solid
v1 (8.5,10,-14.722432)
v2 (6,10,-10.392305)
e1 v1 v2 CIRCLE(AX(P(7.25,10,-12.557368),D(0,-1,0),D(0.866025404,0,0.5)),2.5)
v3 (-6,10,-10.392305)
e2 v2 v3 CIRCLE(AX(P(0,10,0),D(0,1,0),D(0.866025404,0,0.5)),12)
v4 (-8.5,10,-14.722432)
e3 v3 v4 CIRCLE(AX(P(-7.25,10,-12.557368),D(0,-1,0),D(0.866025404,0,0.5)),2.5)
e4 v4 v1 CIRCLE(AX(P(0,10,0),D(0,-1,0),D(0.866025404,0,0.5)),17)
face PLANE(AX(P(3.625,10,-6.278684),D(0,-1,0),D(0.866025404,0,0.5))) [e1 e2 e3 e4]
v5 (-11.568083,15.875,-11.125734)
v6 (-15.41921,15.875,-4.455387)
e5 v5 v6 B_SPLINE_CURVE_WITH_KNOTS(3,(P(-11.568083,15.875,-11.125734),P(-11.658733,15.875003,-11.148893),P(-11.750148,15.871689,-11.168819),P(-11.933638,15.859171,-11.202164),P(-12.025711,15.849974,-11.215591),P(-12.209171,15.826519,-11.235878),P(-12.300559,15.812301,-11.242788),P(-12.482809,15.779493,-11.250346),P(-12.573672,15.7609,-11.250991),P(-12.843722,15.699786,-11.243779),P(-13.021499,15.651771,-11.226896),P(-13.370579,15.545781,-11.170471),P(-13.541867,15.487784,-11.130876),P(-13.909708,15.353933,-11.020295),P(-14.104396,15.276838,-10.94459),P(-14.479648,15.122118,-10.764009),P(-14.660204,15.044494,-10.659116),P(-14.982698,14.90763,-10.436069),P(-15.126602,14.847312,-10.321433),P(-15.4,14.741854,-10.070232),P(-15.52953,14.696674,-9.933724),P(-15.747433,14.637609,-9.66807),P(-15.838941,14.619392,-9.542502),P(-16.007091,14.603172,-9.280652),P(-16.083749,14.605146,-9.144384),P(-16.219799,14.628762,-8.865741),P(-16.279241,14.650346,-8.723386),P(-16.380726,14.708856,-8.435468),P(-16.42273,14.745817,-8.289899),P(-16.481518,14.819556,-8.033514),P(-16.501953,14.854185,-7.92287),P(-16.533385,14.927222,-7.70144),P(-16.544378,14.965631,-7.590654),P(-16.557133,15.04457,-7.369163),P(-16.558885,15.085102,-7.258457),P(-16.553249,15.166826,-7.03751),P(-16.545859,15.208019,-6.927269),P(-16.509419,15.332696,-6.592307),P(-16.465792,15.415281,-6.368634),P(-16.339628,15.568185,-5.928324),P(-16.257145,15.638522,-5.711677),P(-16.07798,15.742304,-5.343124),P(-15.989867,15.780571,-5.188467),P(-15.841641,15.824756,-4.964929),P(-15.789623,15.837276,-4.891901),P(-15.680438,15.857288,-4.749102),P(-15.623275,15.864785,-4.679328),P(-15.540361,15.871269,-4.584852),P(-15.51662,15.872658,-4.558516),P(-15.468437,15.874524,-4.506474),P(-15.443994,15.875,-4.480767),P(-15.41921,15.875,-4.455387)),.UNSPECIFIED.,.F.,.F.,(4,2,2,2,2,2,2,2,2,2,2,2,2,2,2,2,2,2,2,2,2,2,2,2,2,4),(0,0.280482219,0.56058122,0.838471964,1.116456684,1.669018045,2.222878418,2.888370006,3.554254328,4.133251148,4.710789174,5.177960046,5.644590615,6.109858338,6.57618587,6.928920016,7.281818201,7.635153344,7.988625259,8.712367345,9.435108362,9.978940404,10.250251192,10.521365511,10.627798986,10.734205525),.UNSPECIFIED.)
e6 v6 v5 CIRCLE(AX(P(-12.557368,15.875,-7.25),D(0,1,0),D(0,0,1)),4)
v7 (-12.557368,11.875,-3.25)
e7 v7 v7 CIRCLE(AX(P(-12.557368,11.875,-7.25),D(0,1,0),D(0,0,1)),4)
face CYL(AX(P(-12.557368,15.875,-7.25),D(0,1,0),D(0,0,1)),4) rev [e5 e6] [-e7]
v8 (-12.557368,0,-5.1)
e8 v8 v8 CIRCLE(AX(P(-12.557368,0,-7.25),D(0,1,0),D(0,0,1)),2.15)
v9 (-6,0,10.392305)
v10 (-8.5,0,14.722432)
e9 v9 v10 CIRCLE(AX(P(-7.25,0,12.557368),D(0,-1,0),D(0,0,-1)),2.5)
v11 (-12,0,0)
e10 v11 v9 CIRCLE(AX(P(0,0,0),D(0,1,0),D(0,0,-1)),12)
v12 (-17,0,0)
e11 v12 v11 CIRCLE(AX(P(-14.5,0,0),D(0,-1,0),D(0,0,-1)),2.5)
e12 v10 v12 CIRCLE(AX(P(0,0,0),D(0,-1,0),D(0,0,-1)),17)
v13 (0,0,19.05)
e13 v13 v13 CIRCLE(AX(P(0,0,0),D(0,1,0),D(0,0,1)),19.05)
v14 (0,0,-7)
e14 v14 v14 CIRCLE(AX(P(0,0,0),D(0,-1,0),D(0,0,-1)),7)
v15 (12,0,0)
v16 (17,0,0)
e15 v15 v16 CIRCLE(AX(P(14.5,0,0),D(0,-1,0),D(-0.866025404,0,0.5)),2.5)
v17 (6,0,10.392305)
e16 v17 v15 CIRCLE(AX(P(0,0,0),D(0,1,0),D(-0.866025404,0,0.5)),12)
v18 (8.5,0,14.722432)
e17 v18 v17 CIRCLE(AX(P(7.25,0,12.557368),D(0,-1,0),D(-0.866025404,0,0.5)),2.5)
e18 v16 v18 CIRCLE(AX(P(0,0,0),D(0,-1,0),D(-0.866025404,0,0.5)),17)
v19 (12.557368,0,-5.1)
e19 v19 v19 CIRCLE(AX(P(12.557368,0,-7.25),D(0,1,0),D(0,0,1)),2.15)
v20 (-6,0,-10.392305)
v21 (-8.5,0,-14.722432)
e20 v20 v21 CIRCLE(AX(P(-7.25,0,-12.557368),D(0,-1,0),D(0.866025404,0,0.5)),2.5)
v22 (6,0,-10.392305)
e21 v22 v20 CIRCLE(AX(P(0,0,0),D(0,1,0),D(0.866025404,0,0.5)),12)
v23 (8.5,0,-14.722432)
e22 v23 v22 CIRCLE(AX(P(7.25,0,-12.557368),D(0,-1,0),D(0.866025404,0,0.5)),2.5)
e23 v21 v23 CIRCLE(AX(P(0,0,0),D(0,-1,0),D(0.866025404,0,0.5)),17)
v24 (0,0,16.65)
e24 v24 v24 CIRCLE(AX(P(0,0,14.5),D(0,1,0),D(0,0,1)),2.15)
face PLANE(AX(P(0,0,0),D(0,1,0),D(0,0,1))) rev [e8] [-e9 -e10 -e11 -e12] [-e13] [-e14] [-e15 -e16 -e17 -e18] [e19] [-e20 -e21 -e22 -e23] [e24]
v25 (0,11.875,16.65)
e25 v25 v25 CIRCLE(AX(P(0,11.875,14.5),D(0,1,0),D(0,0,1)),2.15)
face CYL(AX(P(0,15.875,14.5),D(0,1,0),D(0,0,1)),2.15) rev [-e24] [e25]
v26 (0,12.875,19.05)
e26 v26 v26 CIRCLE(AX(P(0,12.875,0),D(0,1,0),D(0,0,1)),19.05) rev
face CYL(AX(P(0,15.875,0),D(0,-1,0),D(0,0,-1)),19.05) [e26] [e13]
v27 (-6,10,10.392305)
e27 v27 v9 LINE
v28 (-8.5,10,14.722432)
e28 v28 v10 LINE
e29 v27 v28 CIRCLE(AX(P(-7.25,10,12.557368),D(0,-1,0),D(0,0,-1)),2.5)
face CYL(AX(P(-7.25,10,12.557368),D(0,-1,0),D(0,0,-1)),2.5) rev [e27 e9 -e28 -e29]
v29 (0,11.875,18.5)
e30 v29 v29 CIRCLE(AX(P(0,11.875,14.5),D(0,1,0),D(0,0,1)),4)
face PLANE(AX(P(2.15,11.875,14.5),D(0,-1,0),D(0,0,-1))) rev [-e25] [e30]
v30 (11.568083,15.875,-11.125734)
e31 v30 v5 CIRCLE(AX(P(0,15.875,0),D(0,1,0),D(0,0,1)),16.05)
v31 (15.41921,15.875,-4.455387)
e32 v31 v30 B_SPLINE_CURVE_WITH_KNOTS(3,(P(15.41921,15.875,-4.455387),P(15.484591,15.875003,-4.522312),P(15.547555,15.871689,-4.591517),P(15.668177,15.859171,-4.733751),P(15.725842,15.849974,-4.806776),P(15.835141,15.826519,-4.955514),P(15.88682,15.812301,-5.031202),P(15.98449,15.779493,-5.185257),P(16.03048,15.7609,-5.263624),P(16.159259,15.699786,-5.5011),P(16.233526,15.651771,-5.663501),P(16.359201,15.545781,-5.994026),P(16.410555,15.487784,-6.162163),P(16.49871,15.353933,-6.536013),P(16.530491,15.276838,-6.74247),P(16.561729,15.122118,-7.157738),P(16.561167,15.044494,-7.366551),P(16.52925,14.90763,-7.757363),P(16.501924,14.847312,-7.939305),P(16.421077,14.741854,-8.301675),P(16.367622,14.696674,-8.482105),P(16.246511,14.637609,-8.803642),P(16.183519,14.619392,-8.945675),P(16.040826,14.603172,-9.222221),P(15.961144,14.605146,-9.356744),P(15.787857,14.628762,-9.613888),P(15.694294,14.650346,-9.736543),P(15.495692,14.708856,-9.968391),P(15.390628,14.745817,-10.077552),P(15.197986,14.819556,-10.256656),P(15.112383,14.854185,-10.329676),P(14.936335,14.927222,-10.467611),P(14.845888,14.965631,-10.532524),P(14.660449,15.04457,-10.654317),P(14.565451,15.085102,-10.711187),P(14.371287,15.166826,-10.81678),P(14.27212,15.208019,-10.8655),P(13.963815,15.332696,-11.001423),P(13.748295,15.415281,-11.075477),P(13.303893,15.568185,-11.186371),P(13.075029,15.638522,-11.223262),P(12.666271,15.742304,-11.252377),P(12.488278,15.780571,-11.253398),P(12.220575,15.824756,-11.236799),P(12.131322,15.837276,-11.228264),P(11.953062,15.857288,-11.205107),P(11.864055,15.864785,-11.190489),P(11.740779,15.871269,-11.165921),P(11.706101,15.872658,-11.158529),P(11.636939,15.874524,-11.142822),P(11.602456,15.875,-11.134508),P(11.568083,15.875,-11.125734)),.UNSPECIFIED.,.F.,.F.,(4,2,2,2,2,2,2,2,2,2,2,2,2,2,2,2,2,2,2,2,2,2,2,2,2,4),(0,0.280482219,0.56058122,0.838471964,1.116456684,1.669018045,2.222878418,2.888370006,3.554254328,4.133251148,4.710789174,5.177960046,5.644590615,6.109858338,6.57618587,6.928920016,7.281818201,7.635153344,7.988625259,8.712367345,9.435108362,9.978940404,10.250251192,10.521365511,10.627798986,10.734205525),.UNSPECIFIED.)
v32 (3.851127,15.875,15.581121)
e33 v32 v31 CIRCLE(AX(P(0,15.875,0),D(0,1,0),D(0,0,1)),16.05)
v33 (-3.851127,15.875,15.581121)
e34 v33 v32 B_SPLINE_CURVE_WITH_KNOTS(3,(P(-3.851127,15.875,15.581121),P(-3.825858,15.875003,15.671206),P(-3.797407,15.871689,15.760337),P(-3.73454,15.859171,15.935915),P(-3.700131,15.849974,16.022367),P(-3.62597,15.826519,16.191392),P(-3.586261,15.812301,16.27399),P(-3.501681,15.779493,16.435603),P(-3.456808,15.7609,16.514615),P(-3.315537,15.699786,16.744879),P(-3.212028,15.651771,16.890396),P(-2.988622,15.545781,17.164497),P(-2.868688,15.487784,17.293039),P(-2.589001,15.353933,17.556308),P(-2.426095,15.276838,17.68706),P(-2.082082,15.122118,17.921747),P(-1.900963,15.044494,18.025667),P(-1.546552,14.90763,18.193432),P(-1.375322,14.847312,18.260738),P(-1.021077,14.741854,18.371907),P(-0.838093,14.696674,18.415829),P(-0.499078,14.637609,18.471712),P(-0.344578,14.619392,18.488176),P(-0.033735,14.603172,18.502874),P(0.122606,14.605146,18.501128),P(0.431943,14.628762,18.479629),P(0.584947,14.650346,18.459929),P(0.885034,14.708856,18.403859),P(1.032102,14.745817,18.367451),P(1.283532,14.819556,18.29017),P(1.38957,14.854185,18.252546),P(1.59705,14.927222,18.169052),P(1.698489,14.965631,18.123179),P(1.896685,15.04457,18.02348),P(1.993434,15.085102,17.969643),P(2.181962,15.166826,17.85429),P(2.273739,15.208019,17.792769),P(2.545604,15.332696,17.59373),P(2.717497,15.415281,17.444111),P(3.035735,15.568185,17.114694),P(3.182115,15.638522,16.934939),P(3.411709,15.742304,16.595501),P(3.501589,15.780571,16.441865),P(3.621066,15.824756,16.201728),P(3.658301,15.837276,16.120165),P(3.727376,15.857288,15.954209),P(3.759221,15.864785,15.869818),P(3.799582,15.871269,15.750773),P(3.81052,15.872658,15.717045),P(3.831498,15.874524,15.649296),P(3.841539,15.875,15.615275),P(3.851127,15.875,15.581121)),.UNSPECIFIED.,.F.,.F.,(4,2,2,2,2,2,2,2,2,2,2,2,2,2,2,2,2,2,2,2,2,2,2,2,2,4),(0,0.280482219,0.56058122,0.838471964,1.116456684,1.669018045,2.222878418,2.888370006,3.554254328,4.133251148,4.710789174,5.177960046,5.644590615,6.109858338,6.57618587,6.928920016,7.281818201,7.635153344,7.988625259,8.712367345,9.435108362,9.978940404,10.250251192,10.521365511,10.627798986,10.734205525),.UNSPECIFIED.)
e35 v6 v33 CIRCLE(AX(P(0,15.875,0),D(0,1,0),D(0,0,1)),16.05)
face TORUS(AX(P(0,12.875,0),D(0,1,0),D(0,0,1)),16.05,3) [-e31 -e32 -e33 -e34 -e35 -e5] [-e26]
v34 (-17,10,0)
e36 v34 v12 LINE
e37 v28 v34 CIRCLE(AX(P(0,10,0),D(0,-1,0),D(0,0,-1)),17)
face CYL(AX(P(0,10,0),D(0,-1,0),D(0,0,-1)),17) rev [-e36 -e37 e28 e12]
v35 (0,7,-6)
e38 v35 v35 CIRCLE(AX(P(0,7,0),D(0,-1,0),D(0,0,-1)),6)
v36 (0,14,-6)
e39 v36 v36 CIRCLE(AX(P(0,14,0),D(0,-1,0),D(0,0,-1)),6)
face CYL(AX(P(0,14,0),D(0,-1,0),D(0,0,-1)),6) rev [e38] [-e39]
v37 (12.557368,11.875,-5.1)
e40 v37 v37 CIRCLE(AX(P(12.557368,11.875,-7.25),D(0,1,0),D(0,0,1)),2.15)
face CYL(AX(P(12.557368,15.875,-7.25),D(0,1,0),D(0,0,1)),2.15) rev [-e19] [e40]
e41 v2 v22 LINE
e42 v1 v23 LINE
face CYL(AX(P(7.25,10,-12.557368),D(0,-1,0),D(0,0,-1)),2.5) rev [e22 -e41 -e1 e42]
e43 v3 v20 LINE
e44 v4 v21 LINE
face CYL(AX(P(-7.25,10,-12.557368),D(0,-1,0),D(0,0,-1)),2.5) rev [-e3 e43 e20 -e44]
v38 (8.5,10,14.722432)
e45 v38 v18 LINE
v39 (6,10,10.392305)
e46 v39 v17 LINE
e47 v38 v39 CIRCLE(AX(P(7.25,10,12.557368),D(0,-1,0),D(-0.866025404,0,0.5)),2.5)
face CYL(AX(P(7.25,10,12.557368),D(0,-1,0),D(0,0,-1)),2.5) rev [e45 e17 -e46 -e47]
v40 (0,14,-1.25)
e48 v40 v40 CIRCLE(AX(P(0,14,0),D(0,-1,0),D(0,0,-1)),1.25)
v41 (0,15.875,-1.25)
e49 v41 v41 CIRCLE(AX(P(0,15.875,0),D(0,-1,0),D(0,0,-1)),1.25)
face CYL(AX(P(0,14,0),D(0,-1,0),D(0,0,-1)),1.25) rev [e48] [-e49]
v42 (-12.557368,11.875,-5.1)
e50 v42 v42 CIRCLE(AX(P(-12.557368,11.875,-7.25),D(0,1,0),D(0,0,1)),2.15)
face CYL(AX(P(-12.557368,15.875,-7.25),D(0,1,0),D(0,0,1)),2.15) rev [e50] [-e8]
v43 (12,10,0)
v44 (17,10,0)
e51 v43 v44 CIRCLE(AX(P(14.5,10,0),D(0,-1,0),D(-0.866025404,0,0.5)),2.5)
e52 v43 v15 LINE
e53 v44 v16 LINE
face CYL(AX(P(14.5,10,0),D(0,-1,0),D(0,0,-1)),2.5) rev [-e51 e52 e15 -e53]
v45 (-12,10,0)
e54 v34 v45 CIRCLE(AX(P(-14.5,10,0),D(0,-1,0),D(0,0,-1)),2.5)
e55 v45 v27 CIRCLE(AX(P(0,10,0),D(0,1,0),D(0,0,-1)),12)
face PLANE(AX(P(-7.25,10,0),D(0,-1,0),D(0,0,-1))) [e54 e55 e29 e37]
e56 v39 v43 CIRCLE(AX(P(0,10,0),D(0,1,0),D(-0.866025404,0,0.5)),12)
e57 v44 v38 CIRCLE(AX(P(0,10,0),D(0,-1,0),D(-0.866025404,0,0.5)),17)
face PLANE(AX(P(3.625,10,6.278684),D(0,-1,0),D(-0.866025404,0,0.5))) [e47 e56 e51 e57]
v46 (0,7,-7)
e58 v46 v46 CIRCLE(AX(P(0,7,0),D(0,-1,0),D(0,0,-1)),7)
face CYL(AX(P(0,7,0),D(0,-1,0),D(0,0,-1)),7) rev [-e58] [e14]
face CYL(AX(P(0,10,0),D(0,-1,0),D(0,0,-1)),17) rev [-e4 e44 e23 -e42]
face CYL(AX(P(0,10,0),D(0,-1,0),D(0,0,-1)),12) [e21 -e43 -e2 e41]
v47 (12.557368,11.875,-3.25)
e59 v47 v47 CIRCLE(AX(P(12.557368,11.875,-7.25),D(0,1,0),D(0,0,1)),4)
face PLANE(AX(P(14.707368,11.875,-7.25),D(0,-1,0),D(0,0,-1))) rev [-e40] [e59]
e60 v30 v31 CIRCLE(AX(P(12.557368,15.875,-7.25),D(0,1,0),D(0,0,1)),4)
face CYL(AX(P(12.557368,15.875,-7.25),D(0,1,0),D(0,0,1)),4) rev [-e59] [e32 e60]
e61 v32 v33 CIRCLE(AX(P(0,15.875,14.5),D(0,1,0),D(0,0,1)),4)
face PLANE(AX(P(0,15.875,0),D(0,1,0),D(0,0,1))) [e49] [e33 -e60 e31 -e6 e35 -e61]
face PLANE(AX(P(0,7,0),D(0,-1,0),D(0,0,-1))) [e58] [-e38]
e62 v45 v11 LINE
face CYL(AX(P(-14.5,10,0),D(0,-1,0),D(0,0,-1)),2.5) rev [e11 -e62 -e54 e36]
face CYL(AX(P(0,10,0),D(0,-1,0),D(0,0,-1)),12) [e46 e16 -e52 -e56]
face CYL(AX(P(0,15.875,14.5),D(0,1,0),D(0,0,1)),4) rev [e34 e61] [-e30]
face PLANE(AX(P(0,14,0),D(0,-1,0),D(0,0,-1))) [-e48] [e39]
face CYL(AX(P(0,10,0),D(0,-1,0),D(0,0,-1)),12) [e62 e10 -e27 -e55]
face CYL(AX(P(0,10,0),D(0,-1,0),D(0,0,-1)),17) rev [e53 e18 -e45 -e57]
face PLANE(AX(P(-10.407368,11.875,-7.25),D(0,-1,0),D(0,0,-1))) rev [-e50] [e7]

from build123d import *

# Parameters (mm, degrees)
SKETCH1_R                      = 19.05
BOSS_EXTRUDE1_DEPTH            = 15.875
SKETCH2_R                      = 7
CUT_EXTRUDE1_DEPTH             = 7
SKETCH3_R                      = 6
CUT_EXTRUDE2_DEPTH             = 7
M3X0_5_TAPPED_HOLE1_D          = 2.5
CBORE_FOR_M4_SHCS1_D           = 4.3
CBORE_FOR_M4_SHCS1_CBORE_D     = 8
CBORE_FOR_M4_SHCS1_CBORE_DEPTH = 4
CIRPATTERN1_COUNT              = 3
FILLET1_R                      = 3
CUT_EXTRUDE3_DEPTH             = 10
CIRPATTERN2_COUNT              = 3


with BuildPart() as part:
    # Sketch1 → Boss-Extrude1 (new body)
    with BuildSketch(Plane(origin=(0, 0, 0), x_dir=(1, 0, 0), z_dir=(0, 1, 0))):
        with Locations(Location((0, 0, 0), (0, 0, 270))):
            Circle(SKETCH1_R)
    extrude(amount=BOSS_EXTRUDE1_DEPTH)

    # Sketch2 → Cut-Extrude1 (cut)
    with BuildSketch(Plane.XZ):
        with Locations(Location((0, 0, 0), (0, 0, 270))):
            Circle(SKETCH2_R)
    extrude(amount=-CUT_EXTRUDE1_DEPTH, mode=Mode.SUBTRACT)

    # Sketch3 → Cut-Extrude2 (cut)
    with BuildSketch(Plane.XZ.offset(-7)):
        with Locations(Location((0, 0, 0), (0, 0, 270))):
            Circle(SKETCH3_R)
    extrude(amount=-CUT_EXTRUDE2_DEPTH, mode=Mode.SUBTRACT)

    # M3x0.5 Tapped Hole1 (through all)
    with Locations(Plane.XZ.offset(-14)):
        with Locations((0, 0)):
            Hole(M3X0_5_TAPPED_HOLE1_D / 2)

    # CBORE for M4 SHCS1 (through all)
    with Locations(Plane(origin=(0, 15.875, 0), x_dir=(-1, 0, 0), z_dir=(0, 1, 0))):
        with Locations((0, 14.5)):
            cbore_for_m4_shcs1 = CounterBoreHole(CBORE_FOR_M4_SHCS1_D / 2, CBORE_FOR_M4_SHCS1_CBORE_D / 2, CBORE_FOR_M4_SHCS1_CBORE_DEPTH)

    # CirPattern1: CBORE for M4 SHCS1 ×3 about axis
    cirpattern1_axis = Axis((0, 0, 0), (0, 1, 0))
    for i in range(1, CIRPATTERN1_COUNT):
        add(cbore_for_m4_shcs1.rotate(cirpattern1_axis, i * 360 / CIRPATTERN1_COUNT), mode=Mode.SUBTRACT)

    # Fillet1
    # the kernel refuses this fillet: 3 mm, written as the material it takes off along each edge
    with BuildSketch(Plane(origin=(0, 15.875, 0), x_dir=(0, 0, 1), z_dir=(-1, 0, 0))) as fillet1_piece_1:
        with BuildLine():
            CenterArc((19.05 - FILLET1_R, -FILLET1_R), FILLET1_R, 0, 90)
            Line((19.05 - FILLET1_R, 0), (19.05, 0))
            Line((19.05, 0), (19.05, -FILLET1_R))
        make_face()
    revolve(axis=Axis((0, 15.875, 0), (0, 1, 0)), mode=Mode.SUBTRACT)

    # Sketch9 → Cut-Extrude3 (cut)
    with BuildSketch(Plane.XZ):
        with BuildLine():
            ThreePointArc((-6, 10.392304845), (-5.084936491, 13.807368355), (-8.5, 14.722431864))
            ThreePointArc((-8.5, 14.722431864), (-14.722431864, 8.5), (-17, 0))
            ThreePointArc((-17, 0), (-14.5, -2.5), (-12, 0))
            ThreePointArc((-12, 0), (-10.392304845, 6), (-6, 10.392304845))
        make_face()
    cut_extrude3 = extrude(amount=-CUT_EXTRUDE3_DEPTH, mode=Mode.SUBTRACT)

    # CirPattern2: Cut-Extrude3 ×3 about axis
    cirpattern2_axis = Axis((0, 0, 0), (0, 1, 0))
    for i in range(1, CIRPATTERN2_COUNT):
        add(cut_extrude3.rotate(cirpattern2_axis, i * 360 / CIRPATTERN2_COUNT), mode=Mode.SUBTRACT)


solid = part.part
